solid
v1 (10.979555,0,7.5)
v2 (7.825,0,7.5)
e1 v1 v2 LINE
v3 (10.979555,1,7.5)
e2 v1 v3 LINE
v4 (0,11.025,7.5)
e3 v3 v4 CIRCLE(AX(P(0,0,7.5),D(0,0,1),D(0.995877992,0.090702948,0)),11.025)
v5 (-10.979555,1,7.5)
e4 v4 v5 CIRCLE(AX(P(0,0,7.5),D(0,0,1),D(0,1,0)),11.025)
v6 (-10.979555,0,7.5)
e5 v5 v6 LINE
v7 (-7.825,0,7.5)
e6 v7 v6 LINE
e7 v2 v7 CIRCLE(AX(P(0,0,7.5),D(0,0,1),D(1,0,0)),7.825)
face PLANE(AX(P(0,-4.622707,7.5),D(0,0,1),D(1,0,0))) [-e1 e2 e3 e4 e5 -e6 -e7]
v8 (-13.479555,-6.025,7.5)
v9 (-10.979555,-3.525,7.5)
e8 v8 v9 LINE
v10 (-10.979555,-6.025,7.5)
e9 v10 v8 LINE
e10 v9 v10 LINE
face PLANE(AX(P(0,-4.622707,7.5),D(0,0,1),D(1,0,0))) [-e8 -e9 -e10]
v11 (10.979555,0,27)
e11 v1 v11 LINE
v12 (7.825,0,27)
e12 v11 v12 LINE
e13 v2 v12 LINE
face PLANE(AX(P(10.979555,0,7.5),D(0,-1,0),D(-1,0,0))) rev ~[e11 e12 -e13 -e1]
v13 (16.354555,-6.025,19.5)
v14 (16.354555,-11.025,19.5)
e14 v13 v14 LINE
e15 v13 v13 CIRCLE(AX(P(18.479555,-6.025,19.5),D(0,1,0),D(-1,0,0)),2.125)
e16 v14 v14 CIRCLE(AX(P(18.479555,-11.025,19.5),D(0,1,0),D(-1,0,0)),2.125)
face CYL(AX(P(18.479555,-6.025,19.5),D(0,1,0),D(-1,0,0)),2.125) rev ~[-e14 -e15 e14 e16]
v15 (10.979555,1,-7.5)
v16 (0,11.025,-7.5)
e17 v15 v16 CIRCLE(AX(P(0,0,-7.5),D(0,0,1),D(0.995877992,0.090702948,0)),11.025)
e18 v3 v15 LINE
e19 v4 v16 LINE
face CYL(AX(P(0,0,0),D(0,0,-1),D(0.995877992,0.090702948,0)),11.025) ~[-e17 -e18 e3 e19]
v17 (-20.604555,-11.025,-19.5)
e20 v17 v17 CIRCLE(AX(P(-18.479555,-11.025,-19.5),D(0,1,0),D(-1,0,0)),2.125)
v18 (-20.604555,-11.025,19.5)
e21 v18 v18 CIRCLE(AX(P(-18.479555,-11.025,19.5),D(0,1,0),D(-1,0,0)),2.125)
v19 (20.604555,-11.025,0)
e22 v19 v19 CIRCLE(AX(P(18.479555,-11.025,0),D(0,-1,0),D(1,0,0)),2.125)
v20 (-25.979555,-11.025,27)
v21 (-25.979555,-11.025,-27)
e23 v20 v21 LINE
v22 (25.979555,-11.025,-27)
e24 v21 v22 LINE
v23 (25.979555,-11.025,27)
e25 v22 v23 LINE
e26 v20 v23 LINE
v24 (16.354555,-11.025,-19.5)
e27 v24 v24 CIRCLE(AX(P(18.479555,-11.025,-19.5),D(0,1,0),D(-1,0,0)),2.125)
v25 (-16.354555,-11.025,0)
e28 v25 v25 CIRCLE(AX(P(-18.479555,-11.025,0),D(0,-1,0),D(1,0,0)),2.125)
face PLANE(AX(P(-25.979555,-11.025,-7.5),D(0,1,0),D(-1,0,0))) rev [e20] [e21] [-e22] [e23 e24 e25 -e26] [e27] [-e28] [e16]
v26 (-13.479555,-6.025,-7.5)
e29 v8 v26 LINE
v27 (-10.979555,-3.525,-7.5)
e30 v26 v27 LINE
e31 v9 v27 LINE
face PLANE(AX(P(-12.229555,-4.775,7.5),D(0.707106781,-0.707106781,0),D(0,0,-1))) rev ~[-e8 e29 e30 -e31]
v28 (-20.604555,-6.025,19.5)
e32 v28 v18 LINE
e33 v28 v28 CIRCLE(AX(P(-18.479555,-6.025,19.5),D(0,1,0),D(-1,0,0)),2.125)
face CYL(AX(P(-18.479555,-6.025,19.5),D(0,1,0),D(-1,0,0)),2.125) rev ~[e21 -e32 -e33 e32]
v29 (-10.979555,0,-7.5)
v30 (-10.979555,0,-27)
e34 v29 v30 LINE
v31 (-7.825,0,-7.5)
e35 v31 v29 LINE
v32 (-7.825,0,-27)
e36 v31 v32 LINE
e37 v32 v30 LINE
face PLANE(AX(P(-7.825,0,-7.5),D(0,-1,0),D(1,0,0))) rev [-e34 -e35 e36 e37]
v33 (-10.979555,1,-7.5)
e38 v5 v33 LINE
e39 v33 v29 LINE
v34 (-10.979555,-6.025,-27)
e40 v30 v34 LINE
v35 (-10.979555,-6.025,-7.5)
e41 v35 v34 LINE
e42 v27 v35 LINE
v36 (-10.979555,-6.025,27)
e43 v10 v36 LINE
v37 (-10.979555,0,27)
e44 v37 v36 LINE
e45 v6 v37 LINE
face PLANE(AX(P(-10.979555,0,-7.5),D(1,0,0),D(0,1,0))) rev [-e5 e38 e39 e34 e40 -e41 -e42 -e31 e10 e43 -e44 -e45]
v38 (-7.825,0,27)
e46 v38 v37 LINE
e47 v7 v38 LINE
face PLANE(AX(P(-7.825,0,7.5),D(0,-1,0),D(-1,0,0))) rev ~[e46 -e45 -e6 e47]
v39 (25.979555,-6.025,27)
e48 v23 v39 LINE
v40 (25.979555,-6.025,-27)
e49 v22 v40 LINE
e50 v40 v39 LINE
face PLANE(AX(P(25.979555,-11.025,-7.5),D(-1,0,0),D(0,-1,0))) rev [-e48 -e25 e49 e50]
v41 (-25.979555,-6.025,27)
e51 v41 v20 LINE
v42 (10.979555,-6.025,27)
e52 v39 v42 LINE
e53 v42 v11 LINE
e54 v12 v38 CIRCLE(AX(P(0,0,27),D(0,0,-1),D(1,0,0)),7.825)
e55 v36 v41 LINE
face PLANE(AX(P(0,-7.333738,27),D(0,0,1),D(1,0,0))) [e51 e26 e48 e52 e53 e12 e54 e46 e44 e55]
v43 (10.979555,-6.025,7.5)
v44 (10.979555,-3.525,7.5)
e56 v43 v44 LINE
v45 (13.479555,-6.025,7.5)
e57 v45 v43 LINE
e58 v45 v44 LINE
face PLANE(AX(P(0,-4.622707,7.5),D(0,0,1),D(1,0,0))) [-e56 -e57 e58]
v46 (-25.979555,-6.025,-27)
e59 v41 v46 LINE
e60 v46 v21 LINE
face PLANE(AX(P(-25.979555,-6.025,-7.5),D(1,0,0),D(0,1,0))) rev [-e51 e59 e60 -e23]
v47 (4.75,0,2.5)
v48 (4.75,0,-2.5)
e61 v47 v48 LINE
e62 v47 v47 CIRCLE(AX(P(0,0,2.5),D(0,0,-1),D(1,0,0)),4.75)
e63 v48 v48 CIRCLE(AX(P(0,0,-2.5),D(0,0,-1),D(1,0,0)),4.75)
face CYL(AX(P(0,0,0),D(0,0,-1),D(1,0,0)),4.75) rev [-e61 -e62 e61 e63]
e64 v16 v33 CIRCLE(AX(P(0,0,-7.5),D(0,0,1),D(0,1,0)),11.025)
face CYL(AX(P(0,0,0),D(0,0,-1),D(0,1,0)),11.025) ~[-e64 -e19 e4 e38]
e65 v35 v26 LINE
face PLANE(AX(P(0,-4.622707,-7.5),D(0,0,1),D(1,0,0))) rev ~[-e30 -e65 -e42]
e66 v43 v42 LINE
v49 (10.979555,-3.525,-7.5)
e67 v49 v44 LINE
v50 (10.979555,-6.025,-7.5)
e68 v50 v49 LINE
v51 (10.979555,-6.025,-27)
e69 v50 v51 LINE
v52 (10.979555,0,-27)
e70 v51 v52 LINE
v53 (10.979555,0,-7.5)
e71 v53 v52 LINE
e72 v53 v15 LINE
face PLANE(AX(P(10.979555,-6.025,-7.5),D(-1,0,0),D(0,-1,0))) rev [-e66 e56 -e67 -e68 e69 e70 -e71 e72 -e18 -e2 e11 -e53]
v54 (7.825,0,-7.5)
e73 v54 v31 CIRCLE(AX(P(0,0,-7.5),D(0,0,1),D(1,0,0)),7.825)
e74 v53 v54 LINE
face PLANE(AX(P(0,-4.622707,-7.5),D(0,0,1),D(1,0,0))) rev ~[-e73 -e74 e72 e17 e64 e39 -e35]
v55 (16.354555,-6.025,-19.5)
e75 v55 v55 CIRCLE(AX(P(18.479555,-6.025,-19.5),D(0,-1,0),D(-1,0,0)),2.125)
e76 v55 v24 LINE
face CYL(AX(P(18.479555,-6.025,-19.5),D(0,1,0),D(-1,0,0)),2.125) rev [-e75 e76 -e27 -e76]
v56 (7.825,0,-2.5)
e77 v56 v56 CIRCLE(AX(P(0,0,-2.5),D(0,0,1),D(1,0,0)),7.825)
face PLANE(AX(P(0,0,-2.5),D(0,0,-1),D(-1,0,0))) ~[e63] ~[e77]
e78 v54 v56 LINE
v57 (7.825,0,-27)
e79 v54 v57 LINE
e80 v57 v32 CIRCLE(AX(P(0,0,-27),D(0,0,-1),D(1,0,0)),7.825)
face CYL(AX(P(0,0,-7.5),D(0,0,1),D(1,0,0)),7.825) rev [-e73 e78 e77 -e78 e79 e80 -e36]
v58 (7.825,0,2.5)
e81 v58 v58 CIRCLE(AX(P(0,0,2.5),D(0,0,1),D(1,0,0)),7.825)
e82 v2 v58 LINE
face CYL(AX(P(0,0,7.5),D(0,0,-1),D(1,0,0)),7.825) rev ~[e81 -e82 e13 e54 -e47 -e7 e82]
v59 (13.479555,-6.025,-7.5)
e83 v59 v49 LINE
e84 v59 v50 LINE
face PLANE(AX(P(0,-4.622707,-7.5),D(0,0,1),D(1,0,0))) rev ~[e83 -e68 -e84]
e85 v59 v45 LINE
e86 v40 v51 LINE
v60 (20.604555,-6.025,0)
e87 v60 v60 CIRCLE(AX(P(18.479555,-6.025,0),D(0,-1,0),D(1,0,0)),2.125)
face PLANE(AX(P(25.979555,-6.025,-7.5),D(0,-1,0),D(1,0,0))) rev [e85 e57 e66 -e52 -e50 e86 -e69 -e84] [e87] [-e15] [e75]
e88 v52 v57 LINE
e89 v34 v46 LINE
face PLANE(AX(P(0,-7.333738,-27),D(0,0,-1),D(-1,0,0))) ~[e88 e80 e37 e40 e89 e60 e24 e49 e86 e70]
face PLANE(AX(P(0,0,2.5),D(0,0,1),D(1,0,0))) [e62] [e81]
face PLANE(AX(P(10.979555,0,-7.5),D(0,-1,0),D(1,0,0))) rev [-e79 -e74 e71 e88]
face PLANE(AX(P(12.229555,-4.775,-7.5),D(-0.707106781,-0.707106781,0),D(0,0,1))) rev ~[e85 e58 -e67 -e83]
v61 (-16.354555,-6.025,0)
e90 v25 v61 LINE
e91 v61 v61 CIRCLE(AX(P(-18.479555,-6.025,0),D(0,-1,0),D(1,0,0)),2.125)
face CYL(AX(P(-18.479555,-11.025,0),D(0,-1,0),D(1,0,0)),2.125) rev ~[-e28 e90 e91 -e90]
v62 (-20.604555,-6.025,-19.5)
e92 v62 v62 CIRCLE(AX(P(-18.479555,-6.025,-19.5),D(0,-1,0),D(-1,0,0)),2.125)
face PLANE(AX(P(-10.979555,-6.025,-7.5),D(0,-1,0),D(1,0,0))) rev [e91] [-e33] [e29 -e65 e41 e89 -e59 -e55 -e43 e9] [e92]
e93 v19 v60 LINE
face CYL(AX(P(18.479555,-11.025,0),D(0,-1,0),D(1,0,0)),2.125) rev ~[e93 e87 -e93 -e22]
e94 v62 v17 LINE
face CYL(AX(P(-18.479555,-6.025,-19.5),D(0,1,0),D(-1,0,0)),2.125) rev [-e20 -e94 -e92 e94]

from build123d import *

# Parameters (mm, degrees)
F0_R      = 4.75
F1_DEPTH  = 7.5
F2_R      = 2.125
F3_DEPTH  = 25
F4_R      = 7.825
F5_DEPTH  = 5
F6_SIZE   = 2.5
F8_DEPTH  = 19.5
F9_R      = 2.125
F10_DEPTH = 25


# Not quite as in the source:
# - a pattern or mirror of a feature is missing from the dataset's text; its kind, count and spacing are read off the source's solid


with BuildPart() as f1:
    # F0 (on Top) → F1 (new body, symmetric)
    with BuildSketch(Plane.XY):
        with BuildLine():
            Line((-25.9795548635, -11.025), (0, -11.025))
            Line((0, -11.025), (25.9795548635, -11.025))
            Line((25.9795548635, -11.025), (25.9795548635, -6.025))
            Line((25.9795548635, -6.025), (10.9795548635, -6.025))
            Line((10.9795548635, -6.025), (10.9795548635, 1))
            ThreePointArc((10.9795548635, 1), (7.4338961857, 8.1417327701), (0, 11.025))
            ThreePointArc((0, 11.025), (-7.4338961857, 8.1417327701), (-10.9795548635, 1))
            Line((-10.9795548635, 1), (-10.9795548635, -6.025))
            Line((-10.9795548635, -6.025), (-25.9795548635, -6.025))
            Line((-25.9795548635, -6.025), (-25.9795548635, -11.025))
        make_face()
        Circle(F0_R, mode=Mode.SUBTRACT)
    extrude(amount=F1_DEPTH, both=True)

    # F2 (on face) → F3 (cut)
    with BuildSketch(Plane.XZ.offset(11.025)):
        with Locations((-18.4795548635, 0)):
            Circle(F2_R)
        with Locations((18.4795548635, 0)):
            Circle(F2_R)
    extrude(amount=-F3_DEPTH, mode=Mode.SUBTRACT)

    # F4 (on face) → F5 (cut)
    with BuildSketch(Plane.XY.offset(7.5)):
        Circle(F4_R)
    f5 = extrude(amount=-F5_DEPTH, mode=Mode.SUBTRACT)

    # F5_copies: F5 across plane
    add(f5.mirror(Plane(origin=(0, 0, 0), x_dir=(-1, 0, 0), z_dir=(0, 0, -1))), mode=Mode.SUBTRACT)

    # F6
    f6_edges = [f1.edges().sort_by_distance(p)[0] for p in [
        (-10.979555, -6.025, 0),
        (10.979555, -6.025, 0),
    ]]
    chamfer(f6_edges, length=F6_SIZE)

    # F7 (on face) → F8 (join)
    with BuildSketch(Plane.XY.offset(7.5)):
        with BuildLine():
            Line((-25.9795548635, -11.025), (0, -11.025))
            Line((0, -11.025), (25.9795548635, -11.025))
            Line((25.9795548635, -11.025), (25.9795548635, -6.025))
            Line((25.9795548635, -6.025), (10.9795548635, -6.025))
            Line((10.9795548635, -6.025), (10.9795548635, 0))
            Line((10.9795548635, 0), (7.825, 0))
            ThreePointArc((7.825, 0), (0, -7.825), (-7.825, 0))
            Line((-7.825, 0), (-10.9795548635, 0))
            Line((-10.9795548635, 0), (-10.9795548635, -6.025))
            Line((-10.9795548635, -6.025), (-25.9795548635, -6.025))
            Line((-25.9795548635, -6.025), (-25.9795548635, -11.025))
        make_face()
    f8 = extrude(amount=F8_DEPTH)

    # F8_copies: F8 across plane
    add(f8.mirror(Plane(origin=(0, 0, 0), x_dir=(-1, 0, 0), z_dir=(0, 0, -1))))

    # F9 (on face) → F10 (cut)
    with BuildSketch(Plane(origin=(0, -6.025, 0), x_dir=(-1, 0, 0), z_dir=(0, 1, 0))):
        with Locations((-18.4795548635, 19.5)):
            Circle(F9_R)
        with Locations((18.4795548635, 19.5)):
            Circle(F9_R)
    f10 = extrude(amount=-F10_DEPTH, mode=Mode.SUBTRACT)

    # F10_copies: F10 across plane
    add(f10.mirror(Plane(origin=(0, 0, 0), x_dir=(-1, 0, 0), z_dir=(0, 0, -1))), mode=Mode.SUBTRACT)


solid = f1.part
